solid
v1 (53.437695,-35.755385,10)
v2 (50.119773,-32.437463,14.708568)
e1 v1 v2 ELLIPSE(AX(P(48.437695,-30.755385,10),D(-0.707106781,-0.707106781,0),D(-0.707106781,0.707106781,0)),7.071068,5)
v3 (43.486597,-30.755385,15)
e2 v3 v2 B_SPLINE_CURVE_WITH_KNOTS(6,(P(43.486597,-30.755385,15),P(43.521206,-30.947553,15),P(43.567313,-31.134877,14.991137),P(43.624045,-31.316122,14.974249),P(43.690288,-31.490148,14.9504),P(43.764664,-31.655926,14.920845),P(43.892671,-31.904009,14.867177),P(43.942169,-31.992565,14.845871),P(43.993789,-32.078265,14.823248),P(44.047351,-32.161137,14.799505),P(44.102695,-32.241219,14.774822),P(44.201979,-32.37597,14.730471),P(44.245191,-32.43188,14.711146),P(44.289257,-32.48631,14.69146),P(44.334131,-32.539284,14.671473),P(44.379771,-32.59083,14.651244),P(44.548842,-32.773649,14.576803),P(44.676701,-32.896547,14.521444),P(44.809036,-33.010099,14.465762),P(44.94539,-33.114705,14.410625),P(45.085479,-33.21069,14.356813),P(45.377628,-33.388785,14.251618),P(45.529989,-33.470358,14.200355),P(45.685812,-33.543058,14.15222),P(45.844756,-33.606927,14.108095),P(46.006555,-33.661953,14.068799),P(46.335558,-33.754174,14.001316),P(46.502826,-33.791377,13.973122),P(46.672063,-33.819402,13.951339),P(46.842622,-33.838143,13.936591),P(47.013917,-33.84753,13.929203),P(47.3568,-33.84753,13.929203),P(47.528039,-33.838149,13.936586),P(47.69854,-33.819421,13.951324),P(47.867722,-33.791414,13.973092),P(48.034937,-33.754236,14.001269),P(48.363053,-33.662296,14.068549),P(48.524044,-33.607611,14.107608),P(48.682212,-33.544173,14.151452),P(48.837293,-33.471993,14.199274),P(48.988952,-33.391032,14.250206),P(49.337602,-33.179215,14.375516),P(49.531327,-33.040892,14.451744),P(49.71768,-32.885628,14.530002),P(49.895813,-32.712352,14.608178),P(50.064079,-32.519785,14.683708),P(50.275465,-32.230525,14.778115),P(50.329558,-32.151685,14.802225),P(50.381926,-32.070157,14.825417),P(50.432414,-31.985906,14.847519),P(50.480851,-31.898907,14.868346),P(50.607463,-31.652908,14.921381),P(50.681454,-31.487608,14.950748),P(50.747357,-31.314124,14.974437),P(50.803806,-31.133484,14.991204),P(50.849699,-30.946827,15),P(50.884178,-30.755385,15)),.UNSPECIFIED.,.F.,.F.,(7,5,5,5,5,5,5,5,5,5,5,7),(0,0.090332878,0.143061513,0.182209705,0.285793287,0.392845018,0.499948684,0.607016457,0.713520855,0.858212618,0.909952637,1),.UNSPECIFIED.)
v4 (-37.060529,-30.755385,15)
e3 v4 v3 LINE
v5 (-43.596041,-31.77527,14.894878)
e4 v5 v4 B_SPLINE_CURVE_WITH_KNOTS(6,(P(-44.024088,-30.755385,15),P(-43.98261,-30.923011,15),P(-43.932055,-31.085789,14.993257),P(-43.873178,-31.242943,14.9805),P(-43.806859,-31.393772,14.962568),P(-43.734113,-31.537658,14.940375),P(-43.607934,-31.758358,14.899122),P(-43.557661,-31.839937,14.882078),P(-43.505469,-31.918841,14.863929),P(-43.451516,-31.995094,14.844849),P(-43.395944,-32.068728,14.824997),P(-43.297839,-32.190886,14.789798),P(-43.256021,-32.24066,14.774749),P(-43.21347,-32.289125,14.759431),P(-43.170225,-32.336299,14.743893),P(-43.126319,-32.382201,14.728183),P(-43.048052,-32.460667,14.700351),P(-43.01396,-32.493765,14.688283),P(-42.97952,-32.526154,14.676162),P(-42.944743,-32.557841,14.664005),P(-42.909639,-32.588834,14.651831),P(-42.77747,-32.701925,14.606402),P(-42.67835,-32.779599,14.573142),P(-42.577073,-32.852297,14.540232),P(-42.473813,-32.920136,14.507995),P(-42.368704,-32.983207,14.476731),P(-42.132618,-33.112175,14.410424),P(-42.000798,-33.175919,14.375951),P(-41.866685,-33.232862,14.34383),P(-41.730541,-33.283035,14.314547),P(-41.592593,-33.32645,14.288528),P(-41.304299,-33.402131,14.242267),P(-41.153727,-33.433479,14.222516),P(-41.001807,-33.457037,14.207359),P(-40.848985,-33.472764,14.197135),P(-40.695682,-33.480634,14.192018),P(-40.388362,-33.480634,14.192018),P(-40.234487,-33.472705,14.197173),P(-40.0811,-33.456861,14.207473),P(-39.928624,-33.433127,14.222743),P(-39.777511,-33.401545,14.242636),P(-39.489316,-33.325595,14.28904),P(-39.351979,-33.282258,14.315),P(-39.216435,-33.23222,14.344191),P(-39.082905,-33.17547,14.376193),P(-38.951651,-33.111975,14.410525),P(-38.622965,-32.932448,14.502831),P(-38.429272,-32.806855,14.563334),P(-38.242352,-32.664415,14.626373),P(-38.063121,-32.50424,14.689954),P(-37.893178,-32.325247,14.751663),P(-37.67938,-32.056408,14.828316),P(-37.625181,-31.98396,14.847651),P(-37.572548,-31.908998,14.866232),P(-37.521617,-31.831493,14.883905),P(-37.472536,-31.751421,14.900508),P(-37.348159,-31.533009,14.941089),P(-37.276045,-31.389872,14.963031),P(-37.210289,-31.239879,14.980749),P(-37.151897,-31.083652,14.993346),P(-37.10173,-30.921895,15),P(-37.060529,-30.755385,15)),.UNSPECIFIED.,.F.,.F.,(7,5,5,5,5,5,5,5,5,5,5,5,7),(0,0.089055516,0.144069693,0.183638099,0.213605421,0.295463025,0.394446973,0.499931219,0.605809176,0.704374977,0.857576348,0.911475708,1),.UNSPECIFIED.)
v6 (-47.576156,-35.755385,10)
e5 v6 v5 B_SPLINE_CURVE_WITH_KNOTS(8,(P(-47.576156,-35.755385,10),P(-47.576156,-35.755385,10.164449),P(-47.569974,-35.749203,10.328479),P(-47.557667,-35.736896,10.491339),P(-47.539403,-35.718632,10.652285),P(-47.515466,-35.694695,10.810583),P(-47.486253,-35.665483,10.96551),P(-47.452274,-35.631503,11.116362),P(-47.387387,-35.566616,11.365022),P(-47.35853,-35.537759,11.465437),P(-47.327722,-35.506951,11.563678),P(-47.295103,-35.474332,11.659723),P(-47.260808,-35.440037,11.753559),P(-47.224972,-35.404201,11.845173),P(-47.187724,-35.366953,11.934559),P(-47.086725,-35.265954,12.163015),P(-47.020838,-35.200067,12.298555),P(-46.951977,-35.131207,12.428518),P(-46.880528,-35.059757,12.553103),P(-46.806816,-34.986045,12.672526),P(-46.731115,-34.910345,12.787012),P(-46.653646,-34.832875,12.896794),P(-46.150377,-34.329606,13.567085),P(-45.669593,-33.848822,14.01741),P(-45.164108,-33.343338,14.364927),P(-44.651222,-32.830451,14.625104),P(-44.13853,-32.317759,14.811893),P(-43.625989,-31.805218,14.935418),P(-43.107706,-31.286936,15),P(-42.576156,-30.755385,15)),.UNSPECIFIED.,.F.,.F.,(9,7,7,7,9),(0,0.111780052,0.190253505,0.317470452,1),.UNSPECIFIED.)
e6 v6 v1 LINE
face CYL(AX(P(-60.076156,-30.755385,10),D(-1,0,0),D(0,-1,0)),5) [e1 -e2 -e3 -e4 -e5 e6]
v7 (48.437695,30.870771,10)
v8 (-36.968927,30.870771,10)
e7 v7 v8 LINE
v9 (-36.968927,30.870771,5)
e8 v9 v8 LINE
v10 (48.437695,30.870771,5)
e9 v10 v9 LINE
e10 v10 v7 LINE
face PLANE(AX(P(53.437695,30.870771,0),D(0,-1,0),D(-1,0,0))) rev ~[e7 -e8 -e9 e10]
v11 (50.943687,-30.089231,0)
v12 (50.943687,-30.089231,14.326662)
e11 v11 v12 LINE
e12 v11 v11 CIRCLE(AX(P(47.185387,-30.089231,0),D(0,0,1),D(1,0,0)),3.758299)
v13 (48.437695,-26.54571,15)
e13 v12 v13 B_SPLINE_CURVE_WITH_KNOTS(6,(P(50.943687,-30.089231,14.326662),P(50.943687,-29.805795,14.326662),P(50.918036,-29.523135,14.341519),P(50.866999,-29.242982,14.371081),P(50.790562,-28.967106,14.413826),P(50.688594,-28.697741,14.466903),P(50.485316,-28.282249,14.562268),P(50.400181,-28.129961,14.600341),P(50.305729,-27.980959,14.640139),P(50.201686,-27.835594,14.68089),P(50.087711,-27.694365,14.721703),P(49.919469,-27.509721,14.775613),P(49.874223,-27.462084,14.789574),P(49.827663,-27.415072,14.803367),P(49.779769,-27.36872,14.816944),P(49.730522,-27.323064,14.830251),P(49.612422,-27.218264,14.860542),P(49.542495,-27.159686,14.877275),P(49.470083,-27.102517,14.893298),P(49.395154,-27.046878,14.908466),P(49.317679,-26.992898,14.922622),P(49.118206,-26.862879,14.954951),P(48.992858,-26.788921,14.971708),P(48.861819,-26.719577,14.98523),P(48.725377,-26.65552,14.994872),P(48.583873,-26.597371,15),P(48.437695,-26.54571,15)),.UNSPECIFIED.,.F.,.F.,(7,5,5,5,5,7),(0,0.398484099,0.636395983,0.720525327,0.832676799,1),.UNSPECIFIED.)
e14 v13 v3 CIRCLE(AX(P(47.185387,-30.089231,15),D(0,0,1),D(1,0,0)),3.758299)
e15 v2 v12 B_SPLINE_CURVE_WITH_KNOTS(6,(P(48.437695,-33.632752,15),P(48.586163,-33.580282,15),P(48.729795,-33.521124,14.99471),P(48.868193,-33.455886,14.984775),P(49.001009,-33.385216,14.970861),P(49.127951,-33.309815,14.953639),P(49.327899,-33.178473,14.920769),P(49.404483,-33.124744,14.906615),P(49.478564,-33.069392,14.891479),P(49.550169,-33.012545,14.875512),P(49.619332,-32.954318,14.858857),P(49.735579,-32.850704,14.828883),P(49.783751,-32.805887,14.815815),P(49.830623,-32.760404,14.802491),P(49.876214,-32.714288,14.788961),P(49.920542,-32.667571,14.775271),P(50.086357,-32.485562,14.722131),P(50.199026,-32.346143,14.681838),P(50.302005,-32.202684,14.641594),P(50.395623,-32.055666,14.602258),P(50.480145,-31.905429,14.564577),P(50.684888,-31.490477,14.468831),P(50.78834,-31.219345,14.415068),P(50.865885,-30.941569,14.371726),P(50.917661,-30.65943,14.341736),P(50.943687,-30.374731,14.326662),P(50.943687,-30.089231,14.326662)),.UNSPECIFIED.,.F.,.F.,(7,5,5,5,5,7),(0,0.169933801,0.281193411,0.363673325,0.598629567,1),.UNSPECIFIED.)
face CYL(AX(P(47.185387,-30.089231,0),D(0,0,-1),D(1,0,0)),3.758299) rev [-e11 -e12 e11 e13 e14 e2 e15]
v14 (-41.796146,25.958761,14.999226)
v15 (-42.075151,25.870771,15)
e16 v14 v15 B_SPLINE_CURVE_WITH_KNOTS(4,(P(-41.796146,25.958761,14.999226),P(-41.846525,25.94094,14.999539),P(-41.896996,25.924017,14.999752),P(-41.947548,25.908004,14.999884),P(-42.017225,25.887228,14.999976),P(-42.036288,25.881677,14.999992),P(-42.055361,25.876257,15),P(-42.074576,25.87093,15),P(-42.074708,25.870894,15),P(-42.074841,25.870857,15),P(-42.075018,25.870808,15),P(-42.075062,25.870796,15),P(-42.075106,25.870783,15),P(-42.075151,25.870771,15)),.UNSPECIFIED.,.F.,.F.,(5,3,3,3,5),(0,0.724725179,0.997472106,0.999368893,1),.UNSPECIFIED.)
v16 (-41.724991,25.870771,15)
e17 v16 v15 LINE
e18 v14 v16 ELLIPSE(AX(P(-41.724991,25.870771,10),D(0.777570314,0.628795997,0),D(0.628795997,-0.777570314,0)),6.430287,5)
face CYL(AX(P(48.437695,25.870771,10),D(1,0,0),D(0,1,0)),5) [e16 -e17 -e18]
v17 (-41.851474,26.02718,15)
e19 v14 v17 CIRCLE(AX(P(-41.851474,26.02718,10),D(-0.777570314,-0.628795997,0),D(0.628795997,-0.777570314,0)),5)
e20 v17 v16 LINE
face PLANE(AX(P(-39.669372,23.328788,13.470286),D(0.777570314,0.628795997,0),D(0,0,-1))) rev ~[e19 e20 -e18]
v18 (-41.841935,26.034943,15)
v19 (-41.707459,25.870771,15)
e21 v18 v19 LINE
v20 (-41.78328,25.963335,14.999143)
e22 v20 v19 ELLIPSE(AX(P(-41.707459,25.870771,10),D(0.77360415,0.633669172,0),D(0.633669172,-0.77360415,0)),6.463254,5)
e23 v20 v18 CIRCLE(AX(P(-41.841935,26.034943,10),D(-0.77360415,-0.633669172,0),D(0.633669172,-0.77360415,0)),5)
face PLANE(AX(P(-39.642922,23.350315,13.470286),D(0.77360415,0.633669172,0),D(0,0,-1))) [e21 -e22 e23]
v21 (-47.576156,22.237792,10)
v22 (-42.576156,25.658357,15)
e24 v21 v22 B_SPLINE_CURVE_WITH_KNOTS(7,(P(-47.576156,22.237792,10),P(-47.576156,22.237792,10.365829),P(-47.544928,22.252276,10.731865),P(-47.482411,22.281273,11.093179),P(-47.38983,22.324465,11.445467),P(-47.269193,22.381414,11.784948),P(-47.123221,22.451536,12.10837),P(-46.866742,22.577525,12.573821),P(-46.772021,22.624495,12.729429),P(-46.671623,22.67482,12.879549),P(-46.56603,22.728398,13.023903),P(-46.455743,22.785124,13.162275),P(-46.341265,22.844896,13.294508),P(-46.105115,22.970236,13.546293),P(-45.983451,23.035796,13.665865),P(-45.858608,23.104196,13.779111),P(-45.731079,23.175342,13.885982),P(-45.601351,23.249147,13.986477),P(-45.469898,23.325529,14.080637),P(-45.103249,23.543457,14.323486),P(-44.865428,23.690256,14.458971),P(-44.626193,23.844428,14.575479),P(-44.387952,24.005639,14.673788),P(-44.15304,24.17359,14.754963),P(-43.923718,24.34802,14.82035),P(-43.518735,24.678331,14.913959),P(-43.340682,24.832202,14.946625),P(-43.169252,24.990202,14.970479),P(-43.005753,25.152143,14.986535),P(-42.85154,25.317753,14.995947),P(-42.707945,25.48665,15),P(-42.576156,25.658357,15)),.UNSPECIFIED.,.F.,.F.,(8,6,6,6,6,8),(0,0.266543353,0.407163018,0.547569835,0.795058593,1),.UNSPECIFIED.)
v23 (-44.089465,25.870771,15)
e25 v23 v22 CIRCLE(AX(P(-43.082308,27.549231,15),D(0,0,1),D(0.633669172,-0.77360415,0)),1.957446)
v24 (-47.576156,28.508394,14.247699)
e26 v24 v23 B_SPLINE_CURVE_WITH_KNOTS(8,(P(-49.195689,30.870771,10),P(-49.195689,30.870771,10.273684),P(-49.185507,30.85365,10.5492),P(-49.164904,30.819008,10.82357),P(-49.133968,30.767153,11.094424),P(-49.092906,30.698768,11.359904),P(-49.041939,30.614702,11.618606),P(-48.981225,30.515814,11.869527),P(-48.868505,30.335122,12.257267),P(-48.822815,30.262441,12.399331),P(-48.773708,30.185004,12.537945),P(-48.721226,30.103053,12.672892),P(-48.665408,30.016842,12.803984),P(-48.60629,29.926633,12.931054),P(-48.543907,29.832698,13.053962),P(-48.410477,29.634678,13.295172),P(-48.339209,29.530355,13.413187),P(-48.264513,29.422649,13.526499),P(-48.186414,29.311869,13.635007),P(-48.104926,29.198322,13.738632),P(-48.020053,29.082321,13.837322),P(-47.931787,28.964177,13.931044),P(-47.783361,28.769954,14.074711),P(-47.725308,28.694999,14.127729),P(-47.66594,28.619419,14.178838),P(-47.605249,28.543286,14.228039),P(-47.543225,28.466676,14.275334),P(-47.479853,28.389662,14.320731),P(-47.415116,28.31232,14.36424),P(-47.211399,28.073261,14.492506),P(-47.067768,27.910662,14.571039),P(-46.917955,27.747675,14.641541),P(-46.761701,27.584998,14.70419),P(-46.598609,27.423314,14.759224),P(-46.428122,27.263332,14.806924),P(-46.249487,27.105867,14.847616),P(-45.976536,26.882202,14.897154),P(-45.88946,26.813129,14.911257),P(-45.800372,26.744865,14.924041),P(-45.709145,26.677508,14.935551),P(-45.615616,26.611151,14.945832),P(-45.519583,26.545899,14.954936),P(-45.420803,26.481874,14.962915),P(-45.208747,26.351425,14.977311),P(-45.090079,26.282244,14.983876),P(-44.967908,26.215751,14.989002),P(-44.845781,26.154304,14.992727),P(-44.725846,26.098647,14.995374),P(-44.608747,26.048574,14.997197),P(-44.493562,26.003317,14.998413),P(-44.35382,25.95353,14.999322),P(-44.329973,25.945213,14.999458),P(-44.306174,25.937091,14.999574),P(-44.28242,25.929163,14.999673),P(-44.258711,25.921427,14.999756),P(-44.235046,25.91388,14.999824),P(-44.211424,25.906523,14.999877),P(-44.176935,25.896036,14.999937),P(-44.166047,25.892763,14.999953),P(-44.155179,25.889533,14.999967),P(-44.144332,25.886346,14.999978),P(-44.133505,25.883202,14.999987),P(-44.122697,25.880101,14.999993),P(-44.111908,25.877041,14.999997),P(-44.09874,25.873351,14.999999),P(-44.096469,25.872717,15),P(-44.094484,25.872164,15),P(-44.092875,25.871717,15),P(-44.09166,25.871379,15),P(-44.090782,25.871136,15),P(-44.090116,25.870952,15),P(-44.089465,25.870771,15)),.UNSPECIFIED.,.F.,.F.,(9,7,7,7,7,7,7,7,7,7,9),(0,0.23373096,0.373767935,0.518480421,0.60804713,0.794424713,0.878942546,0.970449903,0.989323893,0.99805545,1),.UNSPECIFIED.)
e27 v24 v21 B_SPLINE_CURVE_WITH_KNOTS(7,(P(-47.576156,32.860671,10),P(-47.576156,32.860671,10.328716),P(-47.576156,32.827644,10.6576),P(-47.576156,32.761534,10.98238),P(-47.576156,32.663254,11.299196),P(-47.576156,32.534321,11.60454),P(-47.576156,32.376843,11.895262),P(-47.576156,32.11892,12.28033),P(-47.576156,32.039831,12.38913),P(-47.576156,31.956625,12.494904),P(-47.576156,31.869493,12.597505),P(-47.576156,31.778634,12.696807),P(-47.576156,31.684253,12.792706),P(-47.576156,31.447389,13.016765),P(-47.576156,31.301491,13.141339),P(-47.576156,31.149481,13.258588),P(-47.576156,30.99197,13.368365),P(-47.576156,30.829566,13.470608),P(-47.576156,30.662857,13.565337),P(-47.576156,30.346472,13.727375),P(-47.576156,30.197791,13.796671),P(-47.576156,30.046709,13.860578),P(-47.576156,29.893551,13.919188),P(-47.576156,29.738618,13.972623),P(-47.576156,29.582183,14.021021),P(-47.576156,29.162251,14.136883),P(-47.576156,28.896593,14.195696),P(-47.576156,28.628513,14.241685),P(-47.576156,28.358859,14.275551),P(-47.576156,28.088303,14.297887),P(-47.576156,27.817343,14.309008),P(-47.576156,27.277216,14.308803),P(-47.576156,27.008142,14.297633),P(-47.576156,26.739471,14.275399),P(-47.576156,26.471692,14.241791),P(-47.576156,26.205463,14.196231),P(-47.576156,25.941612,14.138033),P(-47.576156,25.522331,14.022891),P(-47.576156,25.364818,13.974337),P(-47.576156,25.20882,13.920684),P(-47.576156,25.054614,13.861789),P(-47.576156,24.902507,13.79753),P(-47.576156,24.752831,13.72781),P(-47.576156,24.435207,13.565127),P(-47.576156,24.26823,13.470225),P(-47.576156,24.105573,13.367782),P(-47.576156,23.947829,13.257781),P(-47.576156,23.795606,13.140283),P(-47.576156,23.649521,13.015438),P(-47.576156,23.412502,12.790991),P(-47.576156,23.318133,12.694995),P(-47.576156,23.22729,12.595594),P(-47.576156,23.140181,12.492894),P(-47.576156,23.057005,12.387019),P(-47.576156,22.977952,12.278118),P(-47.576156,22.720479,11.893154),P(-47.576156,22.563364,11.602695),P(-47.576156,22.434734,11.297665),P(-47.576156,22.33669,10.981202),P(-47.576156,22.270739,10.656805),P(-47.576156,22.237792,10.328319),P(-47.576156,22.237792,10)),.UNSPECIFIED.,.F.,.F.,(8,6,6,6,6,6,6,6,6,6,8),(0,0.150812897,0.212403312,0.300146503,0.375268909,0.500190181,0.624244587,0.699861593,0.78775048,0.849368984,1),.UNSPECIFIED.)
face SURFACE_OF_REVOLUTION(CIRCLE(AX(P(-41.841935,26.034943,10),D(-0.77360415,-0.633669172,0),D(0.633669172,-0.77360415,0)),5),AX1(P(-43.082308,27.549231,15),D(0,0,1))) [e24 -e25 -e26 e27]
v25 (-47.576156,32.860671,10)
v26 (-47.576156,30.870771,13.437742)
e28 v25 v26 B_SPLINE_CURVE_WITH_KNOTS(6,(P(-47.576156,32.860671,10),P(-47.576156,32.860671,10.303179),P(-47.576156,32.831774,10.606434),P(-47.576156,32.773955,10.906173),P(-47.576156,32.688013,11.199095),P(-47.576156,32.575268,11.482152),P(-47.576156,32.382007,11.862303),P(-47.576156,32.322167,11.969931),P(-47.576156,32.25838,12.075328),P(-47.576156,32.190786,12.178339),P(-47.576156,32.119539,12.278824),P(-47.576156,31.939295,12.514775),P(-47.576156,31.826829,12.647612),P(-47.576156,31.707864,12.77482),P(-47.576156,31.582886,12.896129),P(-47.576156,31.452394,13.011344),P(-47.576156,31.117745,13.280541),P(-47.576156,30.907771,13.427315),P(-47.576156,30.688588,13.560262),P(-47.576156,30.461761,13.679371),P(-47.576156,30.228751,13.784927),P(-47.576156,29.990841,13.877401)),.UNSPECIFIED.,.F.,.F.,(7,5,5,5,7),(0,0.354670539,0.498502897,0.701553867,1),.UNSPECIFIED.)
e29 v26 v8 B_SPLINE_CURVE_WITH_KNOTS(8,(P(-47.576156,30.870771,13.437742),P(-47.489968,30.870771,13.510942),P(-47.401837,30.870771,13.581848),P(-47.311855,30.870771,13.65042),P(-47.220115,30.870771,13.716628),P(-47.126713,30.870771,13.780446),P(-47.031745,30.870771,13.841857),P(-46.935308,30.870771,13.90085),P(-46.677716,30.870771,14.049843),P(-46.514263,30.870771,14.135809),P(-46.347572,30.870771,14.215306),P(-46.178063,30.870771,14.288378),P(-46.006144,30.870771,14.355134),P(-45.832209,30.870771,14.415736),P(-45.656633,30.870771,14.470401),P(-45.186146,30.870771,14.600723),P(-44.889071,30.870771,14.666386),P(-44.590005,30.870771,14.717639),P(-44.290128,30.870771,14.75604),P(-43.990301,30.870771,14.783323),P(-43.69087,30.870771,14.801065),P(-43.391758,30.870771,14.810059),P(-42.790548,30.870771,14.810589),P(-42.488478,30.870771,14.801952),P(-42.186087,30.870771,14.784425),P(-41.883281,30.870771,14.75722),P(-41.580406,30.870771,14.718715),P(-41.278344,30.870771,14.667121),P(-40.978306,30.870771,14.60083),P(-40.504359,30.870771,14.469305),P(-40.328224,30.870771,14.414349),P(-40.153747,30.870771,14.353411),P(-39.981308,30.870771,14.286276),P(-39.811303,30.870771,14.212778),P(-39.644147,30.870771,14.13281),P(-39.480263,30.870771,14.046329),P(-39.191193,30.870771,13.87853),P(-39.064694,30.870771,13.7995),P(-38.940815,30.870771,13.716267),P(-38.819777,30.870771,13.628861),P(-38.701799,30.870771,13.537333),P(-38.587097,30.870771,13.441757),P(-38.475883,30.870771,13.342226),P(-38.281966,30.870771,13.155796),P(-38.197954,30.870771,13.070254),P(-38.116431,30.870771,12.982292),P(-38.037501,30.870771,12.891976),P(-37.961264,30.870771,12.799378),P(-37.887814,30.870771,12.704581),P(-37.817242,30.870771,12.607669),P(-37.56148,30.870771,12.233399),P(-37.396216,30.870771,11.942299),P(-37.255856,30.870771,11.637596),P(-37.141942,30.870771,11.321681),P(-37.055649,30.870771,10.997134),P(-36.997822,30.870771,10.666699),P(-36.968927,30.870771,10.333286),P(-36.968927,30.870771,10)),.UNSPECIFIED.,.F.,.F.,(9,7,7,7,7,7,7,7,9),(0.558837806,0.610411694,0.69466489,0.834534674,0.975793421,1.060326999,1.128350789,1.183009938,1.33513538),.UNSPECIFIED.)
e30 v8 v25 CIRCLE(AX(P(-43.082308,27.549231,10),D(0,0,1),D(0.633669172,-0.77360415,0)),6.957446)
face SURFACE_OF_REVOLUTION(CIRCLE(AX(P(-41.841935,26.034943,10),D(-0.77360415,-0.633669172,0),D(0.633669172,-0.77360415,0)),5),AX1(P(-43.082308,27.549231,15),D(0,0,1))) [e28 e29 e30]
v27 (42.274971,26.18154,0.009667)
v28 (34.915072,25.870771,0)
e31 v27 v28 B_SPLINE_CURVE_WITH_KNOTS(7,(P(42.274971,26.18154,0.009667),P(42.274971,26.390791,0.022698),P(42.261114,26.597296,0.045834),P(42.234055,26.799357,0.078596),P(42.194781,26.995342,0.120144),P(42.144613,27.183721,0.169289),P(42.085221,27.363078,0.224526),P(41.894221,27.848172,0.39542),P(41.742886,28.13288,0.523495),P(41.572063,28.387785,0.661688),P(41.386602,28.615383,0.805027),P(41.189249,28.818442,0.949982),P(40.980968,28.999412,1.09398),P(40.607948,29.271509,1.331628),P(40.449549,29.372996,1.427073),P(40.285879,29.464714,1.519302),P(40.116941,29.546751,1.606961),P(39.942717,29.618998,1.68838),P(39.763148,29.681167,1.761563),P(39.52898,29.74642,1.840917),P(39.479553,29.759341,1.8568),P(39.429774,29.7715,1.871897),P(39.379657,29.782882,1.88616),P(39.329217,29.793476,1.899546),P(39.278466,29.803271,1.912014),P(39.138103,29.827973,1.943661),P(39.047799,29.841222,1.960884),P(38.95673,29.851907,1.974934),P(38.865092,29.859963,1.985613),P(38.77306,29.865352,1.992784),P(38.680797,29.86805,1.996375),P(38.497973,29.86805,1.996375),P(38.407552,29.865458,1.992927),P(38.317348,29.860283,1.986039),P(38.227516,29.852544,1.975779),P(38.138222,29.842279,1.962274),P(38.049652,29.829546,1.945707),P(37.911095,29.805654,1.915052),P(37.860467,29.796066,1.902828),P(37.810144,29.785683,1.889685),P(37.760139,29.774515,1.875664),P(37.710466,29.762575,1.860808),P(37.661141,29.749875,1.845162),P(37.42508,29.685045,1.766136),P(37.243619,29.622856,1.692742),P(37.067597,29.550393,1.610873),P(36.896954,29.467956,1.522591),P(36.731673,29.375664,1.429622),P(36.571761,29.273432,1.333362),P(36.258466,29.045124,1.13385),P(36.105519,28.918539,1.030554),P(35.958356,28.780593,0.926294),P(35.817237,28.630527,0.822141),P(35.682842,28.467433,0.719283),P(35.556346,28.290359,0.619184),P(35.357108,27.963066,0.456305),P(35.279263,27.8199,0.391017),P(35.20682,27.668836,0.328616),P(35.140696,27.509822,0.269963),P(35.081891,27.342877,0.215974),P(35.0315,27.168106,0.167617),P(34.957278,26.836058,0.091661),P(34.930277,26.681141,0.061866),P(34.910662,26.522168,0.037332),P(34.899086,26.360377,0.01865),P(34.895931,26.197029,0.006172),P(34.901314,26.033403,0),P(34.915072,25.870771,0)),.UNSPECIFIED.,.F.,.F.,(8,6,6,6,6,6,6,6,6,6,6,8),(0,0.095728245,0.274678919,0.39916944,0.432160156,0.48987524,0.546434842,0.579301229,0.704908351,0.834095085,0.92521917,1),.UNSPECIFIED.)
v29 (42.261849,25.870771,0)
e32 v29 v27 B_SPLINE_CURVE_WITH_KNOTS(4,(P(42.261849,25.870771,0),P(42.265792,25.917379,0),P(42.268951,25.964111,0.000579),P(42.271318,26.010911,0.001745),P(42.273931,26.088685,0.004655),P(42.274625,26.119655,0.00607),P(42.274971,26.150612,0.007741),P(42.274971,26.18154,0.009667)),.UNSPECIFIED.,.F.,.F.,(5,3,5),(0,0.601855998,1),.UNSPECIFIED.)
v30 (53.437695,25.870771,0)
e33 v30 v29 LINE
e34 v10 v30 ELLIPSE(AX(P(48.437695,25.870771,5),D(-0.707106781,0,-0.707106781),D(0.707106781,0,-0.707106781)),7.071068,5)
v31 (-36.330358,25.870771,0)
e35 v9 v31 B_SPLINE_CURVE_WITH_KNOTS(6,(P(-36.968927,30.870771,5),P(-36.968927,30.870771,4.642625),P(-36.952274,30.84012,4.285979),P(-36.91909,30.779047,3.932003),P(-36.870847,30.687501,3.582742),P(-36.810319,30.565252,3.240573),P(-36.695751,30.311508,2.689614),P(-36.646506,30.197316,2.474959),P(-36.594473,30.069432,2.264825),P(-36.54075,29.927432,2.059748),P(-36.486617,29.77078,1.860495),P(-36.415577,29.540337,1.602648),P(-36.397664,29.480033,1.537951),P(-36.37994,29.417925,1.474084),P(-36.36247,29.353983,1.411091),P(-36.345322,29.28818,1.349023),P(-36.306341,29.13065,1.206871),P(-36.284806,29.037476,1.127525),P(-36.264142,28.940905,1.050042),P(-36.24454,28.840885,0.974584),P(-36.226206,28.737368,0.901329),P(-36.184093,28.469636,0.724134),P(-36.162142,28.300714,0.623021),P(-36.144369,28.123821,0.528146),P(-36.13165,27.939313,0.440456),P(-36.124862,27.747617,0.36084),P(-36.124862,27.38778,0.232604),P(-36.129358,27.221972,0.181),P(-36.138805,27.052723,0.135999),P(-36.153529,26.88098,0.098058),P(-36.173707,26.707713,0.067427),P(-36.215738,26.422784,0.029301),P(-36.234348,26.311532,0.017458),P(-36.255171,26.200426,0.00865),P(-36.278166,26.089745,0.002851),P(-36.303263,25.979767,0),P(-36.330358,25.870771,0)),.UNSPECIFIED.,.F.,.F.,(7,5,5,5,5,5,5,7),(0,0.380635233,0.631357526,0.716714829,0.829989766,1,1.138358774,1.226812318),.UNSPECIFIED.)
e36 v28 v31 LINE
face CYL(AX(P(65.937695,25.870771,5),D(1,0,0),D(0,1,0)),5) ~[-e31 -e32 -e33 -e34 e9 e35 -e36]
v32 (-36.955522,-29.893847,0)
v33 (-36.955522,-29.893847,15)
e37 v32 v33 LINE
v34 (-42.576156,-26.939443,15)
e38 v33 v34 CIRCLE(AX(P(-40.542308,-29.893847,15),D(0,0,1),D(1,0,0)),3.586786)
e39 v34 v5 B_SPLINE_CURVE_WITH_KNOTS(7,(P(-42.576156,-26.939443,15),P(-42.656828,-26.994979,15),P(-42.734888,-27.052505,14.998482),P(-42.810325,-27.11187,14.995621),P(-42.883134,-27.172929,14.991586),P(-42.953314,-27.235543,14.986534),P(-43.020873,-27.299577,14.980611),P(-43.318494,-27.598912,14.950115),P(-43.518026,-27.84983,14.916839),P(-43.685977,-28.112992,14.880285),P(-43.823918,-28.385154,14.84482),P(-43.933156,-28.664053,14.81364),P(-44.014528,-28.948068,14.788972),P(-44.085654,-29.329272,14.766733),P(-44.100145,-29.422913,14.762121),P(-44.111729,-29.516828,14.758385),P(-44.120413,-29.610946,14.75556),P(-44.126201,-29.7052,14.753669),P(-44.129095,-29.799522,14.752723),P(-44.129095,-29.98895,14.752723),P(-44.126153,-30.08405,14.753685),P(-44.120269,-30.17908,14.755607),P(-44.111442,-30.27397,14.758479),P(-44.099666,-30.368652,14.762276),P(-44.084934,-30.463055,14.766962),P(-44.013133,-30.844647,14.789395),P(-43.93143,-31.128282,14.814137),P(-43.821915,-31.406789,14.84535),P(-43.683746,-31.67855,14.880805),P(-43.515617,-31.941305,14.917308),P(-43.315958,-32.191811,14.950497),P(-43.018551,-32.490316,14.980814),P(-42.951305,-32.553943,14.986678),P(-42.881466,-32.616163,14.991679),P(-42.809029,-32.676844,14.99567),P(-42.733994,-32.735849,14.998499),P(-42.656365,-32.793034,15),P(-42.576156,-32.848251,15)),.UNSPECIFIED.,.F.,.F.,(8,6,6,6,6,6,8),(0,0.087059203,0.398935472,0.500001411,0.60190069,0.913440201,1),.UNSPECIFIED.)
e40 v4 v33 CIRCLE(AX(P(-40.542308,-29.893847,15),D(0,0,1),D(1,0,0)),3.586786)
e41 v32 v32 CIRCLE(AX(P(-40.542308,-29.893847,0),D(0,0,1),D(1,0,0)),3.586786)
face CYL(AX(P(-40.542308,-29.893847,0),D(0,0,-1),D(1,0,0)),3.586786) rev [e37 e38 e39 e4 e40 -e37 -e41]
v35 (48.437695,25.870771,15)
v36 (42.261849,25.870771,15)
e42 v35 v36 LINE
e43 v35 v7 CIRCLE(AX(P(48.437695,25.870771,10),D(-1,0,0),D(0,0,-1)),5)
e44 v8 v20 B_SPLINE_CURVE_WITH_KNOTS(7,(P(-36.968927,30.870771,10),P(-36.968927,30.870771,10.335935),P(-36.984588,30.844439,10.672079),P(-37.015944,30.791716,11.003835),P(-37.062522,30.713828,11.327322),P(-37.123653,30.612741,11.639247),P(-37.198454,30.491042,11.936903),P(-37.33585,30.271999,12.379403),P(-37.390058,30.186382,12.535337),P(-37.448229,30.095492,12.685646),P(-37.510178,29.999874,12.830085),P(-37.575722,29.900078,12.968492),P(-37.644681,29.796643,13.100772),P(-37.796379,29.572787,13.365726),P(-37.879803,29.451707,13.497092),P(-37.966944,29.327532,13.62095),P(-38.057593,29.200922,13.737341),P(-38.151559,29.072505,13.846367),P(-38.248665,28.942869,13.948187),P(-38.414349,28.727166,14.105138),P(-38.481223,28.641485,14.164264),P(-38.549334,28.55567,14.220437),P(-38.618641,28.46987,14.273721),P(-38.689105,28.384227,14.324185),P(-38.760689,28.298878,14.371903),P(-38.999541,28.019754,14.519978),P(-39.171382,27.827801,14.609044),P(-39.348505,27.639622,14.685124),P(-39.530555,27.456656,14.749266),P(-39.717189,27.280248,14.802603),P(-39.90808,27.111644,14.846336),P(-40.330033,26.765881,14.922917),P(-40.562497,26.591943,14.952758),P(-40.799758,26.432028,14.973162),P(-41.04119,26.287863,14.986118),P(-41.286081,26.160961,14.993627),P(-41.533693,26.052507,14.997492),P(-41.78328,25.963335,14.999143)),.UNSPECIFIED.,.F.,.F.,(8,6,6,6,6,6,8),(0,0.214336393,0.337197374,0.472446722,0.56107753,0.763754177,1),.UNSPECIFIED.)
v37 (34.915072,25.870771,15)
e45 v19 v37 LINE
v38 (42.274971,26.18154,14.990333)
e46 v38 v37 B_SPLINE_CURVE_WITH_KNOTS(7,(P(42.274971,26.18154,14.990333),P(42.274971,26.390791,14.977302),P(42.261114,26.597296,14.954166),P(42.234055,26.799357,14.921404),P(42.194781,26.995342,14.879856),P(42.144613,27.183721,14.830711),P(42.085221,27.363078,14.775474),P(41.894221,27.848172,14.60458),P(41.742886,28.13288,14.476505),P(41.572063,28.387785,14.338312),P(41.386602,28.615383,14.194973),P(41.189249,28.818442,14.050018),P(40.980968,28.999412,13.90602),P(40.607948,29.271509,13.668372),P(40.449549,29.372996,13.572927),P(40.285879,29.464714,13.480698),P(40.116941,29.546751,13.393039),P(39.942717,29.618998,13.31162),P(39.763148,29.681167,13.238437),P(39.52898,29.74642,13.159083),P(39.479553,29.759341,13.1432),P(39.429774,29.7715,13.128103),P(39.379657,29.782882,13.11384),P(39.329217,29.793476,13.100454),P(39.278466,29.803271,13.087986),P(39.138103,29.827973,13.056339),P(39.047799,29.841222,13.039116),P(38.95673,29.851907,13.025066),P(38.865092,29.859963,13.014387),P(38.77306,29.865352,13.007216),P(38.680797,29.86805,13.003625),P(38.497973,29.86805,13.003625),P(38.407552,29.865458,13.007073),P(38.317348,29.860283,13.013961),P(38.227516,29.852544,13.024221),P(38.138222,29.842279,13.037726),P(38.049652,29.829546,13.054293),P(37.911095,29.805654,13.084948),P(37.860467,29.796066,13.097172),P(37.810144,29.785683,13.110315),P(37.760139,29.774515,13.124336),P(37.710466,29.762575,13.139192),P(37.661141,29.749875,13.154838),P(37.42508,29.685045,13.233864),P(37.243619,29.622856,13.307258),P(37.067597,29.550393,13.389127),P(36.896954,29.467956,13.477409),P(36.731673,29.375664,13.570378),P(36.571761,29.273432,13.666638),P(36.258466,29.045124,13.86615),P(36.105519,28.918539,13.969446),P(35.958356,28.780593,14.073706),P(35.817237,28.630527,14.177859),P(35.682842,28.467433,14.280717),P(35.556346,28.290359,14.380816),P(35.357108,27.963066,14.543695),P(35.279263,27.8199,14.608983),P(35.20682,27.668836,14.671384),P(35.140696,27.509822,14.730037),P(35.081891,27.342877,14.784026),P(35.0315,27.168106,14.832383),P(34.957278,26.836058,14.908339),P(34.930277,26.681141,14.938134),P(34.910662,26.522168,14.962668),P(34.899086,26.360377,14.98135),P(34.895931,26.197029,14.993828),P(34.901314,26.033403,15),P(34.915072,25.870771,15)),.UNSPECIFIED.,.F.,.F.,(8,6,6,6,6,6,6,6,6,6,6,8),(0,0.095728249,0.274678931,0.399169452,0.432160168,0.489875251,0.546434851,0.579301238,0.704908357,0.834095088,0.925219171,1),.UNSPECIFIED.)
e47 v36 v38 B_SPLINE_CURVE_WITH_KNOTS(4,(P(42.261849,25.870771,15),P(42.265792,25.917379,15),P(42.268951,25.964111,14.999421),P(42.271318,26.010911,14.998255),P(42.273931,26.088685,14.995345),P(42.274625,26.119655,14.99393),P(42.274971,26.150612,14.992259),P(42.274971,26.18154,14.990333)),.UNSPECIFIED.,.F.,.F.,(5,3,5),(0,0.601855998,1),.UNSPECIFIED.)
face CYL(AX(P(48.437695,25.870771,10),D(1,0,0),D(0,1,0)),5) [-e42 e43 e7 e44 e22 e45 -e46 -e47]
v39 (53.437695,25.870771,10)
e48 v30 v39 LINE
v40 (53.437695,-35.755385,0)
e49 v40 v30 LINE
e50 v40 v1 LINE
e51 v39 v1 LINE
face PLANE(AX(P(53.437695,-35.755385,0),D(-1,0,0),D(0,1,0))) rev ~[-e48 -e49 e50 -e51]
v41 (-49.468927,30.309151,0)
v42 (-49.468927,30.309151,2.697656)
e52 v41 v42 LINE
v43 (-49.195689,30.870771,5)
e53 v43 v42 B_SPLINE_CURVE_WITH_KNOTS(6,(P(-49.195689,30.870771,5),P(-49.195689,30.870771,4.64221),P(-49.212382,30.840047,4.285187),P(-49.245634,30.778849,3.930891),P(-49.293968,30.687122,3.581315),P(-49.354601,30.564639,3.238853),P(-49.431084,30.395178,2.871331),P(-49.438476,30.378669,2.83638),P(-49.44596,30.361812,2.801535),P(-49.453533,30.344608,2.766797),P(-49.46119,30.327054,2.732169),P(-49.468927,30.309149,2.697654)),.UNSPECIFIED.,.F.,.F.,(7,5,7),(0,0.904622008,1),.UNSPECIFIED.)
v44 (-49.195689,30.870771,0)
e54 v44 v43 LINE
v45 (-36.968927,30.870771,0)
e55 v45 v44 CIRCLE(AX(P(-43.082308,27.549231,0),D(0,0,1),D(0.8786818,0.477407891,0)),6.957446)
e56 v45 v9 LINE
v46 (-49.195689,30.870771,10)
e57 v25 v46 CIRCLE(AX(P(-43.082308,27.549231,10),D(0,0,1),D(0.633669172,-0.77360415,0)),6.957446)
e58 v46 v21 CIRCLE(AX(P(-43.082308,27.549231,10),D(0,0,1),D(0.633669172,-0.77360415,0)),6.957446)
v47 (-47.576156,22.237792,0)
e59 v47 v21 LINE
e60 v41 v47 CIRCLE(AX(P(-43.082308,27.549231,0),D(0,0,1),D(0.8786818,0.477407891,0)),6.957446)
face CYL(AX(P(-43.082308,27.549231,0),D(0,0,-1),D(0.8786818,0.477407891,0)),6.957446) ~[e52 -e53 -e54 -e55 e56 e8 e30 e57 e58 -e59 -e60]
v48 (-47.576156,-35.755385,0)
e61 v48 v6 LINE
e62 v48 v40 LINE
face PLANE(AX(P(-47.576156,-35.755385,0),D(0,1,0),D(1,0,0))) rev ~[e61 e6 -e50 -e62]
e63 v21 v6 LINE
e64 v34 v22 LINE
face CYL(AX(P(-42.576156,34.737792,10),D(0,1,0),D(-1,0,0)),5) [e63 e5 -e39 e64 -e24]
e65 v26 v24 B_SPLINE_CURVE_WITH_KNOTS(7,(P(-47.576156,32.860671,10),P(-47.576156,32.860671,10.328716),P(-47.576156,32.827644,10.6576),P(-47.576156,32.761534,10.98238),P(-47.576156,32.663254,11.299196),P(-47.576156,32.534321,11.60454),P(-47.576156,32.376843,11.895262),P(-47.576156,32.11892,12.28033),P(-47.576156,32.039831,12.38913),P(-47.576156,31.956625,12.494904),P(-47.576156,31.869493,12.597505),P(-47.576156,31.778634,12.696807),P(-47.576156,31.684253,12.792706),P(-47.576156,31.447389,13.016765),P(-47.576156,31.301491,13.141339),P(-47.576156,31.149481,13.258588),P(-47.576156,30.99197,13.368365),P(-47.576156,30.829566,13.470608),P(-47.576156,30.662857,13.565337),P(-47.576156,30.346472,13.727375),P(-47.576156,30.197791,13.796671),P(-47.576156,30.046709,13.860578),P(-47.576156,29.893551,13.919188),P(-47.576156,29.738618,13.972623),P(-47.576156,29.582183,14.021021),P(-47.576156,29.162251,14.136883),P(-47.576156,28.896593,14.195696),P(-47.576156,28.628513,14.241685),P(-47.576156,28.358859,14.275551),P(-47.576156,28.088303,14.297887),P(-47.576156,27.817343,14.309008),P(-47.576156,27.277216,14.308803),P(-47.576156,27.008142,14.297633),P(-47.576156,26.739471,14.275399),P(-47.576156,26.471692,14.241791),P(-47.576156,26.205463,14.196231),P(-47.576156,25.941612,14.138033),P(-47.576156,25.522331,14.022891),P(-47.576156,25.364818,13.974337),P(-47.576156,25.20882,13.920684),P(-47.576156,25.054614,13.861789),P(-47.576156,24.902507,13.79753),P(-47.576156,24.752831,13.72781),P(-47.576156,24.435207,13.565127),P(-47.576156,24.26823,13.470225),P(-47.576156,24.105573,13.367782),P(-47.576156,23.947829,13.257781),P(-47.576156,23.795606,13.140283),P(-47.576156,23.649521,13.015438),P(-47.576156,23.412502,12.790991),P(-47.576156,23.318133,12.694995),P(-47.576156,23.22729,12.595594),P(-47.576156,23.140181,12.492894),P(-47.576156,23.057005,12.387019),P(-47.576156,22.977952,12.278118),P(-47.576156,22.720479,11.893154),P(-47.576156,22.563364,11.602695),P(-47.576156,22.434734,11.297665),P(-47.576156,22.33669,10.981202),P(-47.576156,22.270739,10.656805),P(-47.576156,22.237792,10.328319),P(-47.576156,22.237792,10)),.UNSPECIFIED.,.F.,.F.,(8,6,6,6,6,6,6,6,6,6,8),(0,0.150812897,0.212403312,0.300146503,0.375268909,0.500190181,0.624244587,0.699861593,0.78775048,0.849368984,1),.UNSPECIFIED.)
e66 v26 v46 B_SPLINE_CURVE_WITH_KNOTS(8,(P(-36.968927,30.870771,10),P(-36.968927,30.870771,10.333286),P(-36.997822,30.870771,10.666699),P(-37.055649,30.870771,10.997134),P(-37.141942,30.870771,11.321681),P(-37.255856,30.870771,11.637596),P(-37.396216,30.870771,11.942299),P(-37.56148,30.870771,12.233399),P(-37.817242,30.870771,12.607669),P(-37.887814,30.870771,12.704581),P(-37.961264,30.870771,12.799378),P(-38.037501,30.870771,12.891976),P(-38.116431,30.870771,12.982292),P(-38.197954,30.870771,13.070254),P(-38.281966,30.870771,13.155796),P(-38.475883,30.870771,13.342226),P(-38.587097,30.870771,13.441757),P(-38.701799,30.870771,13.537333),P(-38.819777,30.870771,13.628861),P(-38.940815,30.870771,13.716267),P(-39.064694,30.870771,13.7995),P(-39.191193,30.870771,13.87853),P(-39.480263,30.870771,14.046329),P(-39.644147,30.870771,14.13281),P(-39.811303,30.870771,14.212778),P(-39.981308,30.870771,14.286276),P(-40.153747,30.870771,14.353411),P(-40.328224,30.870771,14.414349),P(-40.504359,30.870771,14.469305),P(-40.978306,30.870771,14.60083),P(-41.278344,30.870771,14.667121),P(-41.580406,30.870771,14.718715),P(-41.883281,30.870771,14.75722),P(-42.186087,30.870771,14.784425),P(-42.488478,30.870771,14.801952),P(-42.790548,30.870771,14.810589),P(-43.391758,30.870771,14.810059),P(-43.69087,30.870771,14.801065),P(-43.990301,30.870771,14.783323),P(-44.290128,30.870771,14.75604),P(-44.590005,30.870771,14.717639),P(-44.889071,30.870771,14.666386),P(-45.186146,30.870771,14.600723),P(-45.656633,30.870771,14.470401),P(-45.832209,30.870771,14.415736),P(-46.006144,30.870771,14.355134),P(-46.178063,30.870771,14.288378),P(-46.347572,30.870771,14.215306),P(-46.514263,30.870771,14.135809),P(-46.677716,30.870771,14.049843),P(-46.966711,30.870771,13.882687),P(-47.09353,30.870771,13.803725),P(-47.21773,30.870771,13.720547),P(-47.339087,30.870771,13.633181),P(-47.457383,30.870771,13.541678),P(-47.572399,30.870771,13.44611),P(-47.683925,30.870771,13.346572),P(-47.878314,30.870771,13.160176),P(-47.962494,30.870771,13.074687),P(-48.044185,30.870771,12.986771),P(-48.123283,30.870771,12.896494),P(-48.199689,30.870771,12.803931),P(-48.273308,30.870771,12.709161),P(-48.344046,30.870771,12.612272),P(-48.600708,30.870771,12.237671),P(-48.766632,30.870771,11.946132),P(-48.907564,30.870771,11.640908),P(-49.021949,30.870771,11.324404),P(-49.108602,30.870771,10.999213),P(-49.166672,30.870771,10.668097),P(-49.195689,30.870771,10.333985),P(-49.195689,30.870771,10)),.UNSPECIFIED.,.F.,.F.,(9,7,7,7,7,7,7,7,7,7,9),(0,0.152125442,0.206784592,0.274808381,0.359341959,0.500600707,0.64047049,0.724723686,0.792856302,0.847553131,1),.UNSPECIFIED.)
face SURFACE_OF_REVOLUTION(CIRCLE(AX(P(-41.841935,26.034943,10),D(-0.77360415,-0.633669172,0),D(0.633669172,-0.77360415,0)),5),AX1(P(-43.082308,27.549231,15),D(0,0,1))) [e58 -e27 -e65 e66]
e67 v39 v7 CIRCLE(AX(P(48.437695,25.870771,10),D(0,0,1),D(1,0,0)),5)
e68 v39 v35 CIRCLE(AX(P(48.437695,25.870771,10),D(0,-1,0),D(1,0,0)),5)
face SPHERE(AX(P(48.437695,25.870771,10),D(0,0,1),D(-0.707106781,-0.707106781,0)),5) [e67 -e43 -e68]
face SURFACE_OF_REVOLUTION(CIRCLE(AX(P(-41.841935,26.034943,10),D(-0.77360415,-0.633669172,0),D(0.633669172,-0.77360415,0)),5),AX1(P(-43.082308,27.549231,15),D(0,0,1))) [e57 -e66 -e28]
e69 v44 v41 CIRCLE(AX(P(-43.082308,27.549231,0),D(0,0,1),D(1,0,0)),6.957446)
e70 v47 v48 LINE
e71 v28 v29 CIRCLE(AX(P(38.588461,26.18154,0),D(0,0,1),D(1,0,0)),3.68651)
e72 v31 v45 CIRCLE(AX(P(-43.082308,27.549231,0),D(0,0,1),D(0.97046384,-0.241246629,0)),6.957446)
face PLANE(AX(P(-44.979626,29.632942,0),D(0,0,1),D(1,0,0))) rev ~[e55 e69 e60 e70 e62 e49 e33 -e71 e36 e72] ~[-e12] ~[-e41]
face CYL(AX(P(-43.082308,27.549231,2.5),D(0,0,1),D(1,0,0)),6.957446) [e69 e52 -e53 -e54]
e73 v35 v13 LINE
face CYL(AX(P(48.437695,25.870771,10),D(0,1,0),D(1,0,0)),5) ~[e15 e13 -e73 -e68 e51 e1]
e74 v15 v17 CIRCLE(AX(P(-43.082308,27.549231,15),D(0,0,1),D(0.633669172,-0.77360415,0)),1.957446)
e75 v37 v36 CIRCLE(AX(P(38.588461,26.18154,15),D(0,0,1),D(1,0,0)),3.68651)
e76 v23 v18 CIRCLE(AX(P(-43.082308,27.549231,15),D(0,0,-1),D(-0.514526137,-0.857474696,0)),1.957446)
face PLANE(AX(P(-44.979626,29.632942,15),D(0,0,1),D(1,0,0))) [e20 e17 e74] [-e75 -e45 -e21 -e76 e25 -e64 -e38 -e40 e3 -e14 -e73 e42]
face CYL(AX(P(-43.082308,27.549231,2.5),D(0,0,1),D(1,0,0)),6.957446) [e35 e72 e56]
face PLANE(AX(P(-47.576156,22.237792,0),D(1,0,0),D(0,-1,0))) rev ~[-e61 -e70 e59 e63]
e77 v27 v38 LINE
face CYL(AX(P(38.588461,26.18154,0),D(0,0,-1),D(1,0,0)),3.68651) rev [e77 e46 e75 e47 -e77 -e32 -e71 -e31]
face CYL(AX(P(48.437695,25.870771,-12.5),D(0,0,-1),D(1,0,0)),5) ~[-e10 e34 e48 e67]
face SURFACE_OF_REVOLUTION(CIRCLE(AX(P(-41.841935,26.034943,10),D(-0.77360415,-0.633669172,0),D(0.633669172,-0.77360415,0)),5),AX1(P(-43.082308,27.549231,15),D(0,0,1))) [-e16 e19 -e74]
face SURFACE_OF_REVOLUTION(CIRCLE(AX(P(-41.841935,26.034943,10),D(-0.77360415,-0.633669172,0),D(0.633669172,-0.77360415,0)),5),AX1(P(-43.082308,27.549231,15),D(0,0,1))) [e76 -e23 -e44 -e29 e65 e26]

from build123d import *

# Parameters (mm, degrees)
F0_R         = 3.586786404
F0_R_2       = 3.7582992631
F0_R_3       = 3.6865102679
F1_DEPTH     = 15
F2_T1_DEPTH  = 126.0138504207
F2_T3_DEPTH  = 22.5
F2_T5_DEPTH  = 74.126155749
F2_S9_W      = 5
F2_S9_H      = 5
F2_T10_DEPTH = 5
F2_T16_DEPTH = 97.9066217834
F2_S17_R     = 6.9574459714
F2_T18_DEPTH = 51
F2_T22_DEPTH = 82.9931766736
F2_S23_R     = 6.9574459714
F2_T24_DEPTH = 43
F2_T28_ANGLE = 359.64
F2_T34_ANGLE = 359.64
F2_T40_ANGLE = 359.64
F2_T46_DEPTH = 115.4066217834
F2_S47_R     = 6.9574459714
F2_T48_DEPTH = 59
F2_T53_ANGLE = 359.64
F2_T58_DEPTH = 97.9066217834
F2_S59_R     = 6.9574459714
F2_T60_DEPTH = 51
F2_T66_ANGLE = 359.64
F2_T71_DEPTH = 82.9931766736
F2_S72_R     = 6.9574459714
F2_T73_DEPTH = 43


# Not quite as in the source:
# - a fillet or chamfer that OpenCascade refuses, or shapes differently, is made with other operations: its cross-section is extruded or revolved along the edge and cut away or added


with BuildPart() as f1:
    # F0 (on Top) → F1 (new body)
    with BuildSketch(Plane.XY):
        with BuildLine():
            Line((-47.5761555135, 22.2377919602), (-47.5761555135, 30.8707710356))
            Line((-47.5761555135, 30.8707710356), (-36.9689268762, 30.8707710356))
            ThreePointArc((-36.9689268762, 30.8707710356), (-47.4740962985, 32.9453643179), (-47.5761555135, 22.2377919602))
        make_face()
        with BuildLine():
            Line((-36.9689268762, 30.8707710356), (-47.5761555135, 30.8707710356))
            Line((-47.5761555135, 30.8707710356), (-47.5761555135, 22.2377919602))
            ThreePointArc((-47.5761555135, 22.2377919602), (-40.1548216165, 21.2376644422), (-36.1248620528, 27.5492314249))
            ThreePointArc((-36.1248620528, 27.5492314249), (-36.3391791701, 29.2627855393), (-36.9689268762, 30.8707710356))
        make_face()
        with BuildLine():
            Line((53.4376949072, 30.8707710356), (-36.9689268762, 30.8707710356))
            ThreePointArc((-36.9689268762, 30.8707710356), (-36.3391791701, 29.2627855393), (-36.1248620528, 27.5492314249))
            ThreePointArc((-36.1248620528, 27.5492314249), (-40.1548216165, 21.2376644422), (-47.5761555135, 22.2377919602))
            Line((-47.5761555135, 22.2377919602), (-47.5761555135, -35.7553847134))
            Line((-47.5761555135, -35.7553847134), (53.4376949072, -35.7553847134))
            Line((53.4376949072, -35.7553847134), (53.4376949072, 30.8707710356))
        make_face()
        with Locations((-40.5423082411, -29.8938471824)):
            Circle(F0_R, mode=Mode.SUBTRACT)
        with Locations((47.1853874624, -30.089231208)):
            Circle(F0_R_2, mode=Mode.SUBTRACT)
        with Locations((38.5884605348, 26.1815395206)):
            Circle(F0_R_3, mode=Mode.SUBTRACT)
    extrude(amount=F1_DEPTH)

    # F2: fillet of radius 5 on 7 edges, made by hand

    # F2_s2 → F2_t1 (cut)
    with BuildSketch(Plane.YZ.offset(-60.0761555135)):
        with BuildLine():
            ThreePointArc((-35.7553847134, 10), (-34.2909186193, 13.5355339059), (-30.7553847134, 15))
            Line((-30.7553847134, 15), (-35.7553847134, 15))
            Line((-35.7553847134, 15), (-35.7553847134, 10))
        make_face()
    extrude(amount=F2_T1_DEPTH, mode=Mode.SUBTRACT)

    # F2_s4 → F2_t3 (cut)
    with BuildSketch(Plane.XY.offset(-12.5)):
        with BuildLine():
            ThreePointArc((53.4376949072, 25.8707710356), (51.9732288131, 29.4063049415), (48.4376949072, 30.8707710356))
            Line((48.4376949072, 30.8707710356), (53.4376949072, 30.8707710356))
            Line((53.4376949072, 30.8707710356), (53.4376949072, 25.8707710356))
        make_face()
    extrude(amount=F2_T3_DEPTH, mode=Mode.SUBTRACT)

    # F2_s6 → F2_t5 (cut)
    with BuildSketch(Plane.XZ.offset(-25.8707710356)):
        with BuildLine():
            ThreePointArc((53.4376949072, 10), (51.9732288131, 13.5355339059), (48.4376949072, 15))
            Line((48.4376949072, 15), (53.4376949072, 15))
            Line((53.4376949072, 15), (53.4376949072, 10))
        make_face()
    extrude(amount=F2_T5_DEPTH, mode=Mode.SUBTRACT)


with BuildPart() as f2_tool8:
    # F2_s9 → F2_t10 (new body)
    with BuildSketch(Plane.XY.offset(10)):
        with Locations((50.9376949072, 28.3707710356)):
            Rectangle(F2_S9_W, F2_S9_H)
    extrude(amount=F2_T10_DEPTH)

    # F2_s11 → F2_t12 (revolve, cut)
    with BuildSketch(Plane(origin=(48.4376949072, 25.8707710356, 10), x_dir=(-0.7071067812, -0.7071067812, 0), z_dir=(-0.7071067812, 0.7071067812, 0))):
        with BuildLine():
            ThreePointArc((0, -5), (5, 0), (0, 5))
            Line((0, 5), (0, -5))
        make_face()
    revolve(axis=Axis((48.4376949072, 25.8707710356, 10), (0, 0, 1)), mode=Mode.SUBTRACT)


with BuildPart() as f1_1:
    add(f1.part)

    # F2_t7: cut F2_tool8
    add(f2_tool8.part, mode=Mode.SUBTRACT)


with BuildPart() as f2_tool14:
    # F2_s15 → F2_t16 (new body)
    with BuildSketch(Plane.YZ.offset(48.4376949072)):
        with BuildLine():
            ThreePointArc((30.8707710356, 10), (29.4063049415, 13.5355339059), (25.8707710356, 15))
            Line((25.8707710356, 15), (30.8707710356, 15))
            Line((30.8707710356, 15), (30.8707710356, 10))
        make_face()
    extrude(amount=-F2_T16_DEPTH)

    # F2_s17 → F2_t18 (cut, symmetric)
    with BuildSketch(Plane.XY.offset(12.5)):
        with Locations((-43.0823080242, 27.5492314249)):
            Circle(F2_S17_R)
    extrude(amount=F2_T18_DEPTH, both=True, mode=Mode.SUBTRACT)


with BuildPart() as f1_2:
    add(f1_1.part)

    # F2_t13: cut F2_tool14
    add(f2_tool14.part, mode=Mode.SUBTRACT)


with BuildPart() as f2_tool20:
    # F2_s21 → F2_t22 (new body)
    with BuildSketch(Plane.XZ.offset(-34.7377919602)):
        with BuildLine():
            ThreePointArc((-47.5761555135, 10), (-46.1116894195, 13.5355339059), (-42.5761555135, 15))
            Line((-42.5761555135, 15), (-47.5761555135, 15))
            Line((-47.5761555135, 15), (-47.5761555135, 10))
        make_face()
    extrude(amount=F2_T22_DEPTH)

    # F2_s23 → F2_t24 (cut, symmetric)
    with BuildSketch(Plane.XY.offset(12.5)):
        with Locations((-43.0823080242, 27.5492314249)):
            Circle(F2_S23_R)
    extrude(amount=F2_T24_DEPTH, both=True, mode=Mode.SUBTRACT)


with BuildPart() as f1_3:
    add(f1_2.part)

    # F2_t19: cut F2_tool20
    add(f2_tool20.part, mode=Mode.SUBTRACT)


with BuildPart() as f2_tool26:
    # F2_s27 → F2_t28 (revolve)
    with BuildSketch(Plane(origin=(-12.2782997509, -10.0573142374, 0), x_dir=(0, 0, 1), z_dir=(-0.77360415, -0.6336691716, 0))):
        with BuildLine():
            ThreePointArc((10, 41.6546842262), (13.5355339059, 43.1191503203), (15, 46.6546842262))
            Line((15, 46.6546842262), (15, 41.6546842262))
            Line((15, 41.6546842262), (10, 41.6546842262))
        make_face()
    revolve(axis=Axis((-43.0823080242, 27.5492314249, 15), (0, 0, 1)), revolution_arc=F2_T28_ANGLE)

    split(bisect_by=Plane.XZ.offset(-30.8707710356), keep=Keep.TOP)

    split(bisect_by=Plane.YZ.offset(-47.5761555135), keep=Keep.BOTTOM)


with BuildPart() as f1_4:
    add(f1_3.part)

    # F2_t25: cut F2_tool26
    add(f2_tool26.part, mode=Mode.SUBTRACT)


with BuildPart() as f2_tool32:
    # F2_s33 → F2_t34 (revolve)
    with BuildSketch(Plane(origin=(-12.2782997509, -10.0573142374, 0), x_dir=(0, 0, 1), z_dir=(-0.77360415, -0.6336691716, 0))):
        with BuildLine():
            ThreePointArc((10, 41.6546842262), (13.5355339059, 43.1191503203), (15, 46.6546842262))
            Line((15, 46.6546842262), (15, 41.6546842262))
            Line((15, 41.6546842262), (10, 41.6546842262))
        make_face()
    revolve(axis=Axis((-43.0823080242, 27.5492314249, 15), (0, 0, 1)), revolution_arc=F2_T34_ANGLE)

    split(bisect_by=Plane.XZ.offset(-30.8707710356), keep=Keep.BOTTOM)

    split(bisect_by=Plane.YZ.offset(-47.5761555135), keep=Keep.TOP)


with BuildPart() as f1_5:
    add(f1_4.part)

    # F2_t31: cut F2_tool32
    add(f2_tool32.part, mode=Mode.SUBTRACT)


with BuildPart() as f2_tool38:
    # F2_s39 → F2_t40 (revolve)
    with BuildSketch(Plane(origin=(-12.2782997509, -10.0573142374, 0), x_dir=(0, 0, 1), z_dir=(-0.77360415, -0.6336691716, 0))):
        with BuildLine():
            ThreePointArc((10, 41.6546842262), (13.5355339059, 43.1191503203), (15, 46.6546842262))
            Line((15, 46.6546842262), (15, 41.6546842262))
            Line((15, 41.6546842262), (10, 41.6546842262))
        make_face()
    revolve(axis=Axis((-43.0823080242, 27.5492314249, 15), (0, 0, 1)), revolution_arc=F2_T40_ANGLE)

    split(bisect_by=Plane.XZ.offset(-30.8707710356), keep=Keep.BOTTOM)

    split(bisect_by=Plane.YZ.offset(-47.5761555135), keep=Keep.BOTTOM)


with BuildPart() as f1_6:
    add(f1_5.part)

    # F2_t37: cut F2_tool38
    add(f2_tool38.part, mode=Mode.SUBTRACT)


with BuildPart() as f2_tool44:
    # F2_s45 → F2_t46 (new body)
    with BuildSketch(Plane.YZ.offset(65.9376949072)):
        with BuildLine():
            ThreePointArc((30.8707710356, 5), (29.4063049415, 1.4644660941), (25.8707710356, 0))
            Line((25.8707710356, 0), (30.8707710356, 0))
            Line((30.8707710356, 0), (30.8707710356, 5))
        make_face()
    extrude(amount=-F2_T46_DEPTH)

    # F2_s47 → F2_t48 (cut, symmetric)
    with BuildSketch(Plane.XY.offset(2.5)):
        with Locations((-43.0823080242, 27.5492314249)):
            Circle(F2_S47_R)
    extrude(amount=F2_T48_DEPTH, both=True, mode=Mode.SUBTRACT)


with BuildPart() as f1_7:
    add(f1_6.part)

    # F2_t43: cut F2_tool44
    add(f2_tool44.part, mode=Mode.SUBTRACT)


with BuildPart() as f2_tool51:
    # F2_s52 → F2_t53 (revolve)
    with BuildSketch(Plane(origin=(-12.2782997509, -10.0573142374, 0), x_dir=(0, 0, 1), z_dir=(-0.77360415, -0.6336691716, 0))):
        with BuildLine():
            ThreePointArc((10, 41.6546842262), (13.5355339059, 43.1191503203), (15, 46.6546842262))
            Line((15, 46.6546842262), (15, 41.6546842262))
            Line((15, 41.6546842262), (10, 41.6546842262))
        make_face()
    revolve(axis=Axis((-43.0823080242, 27.5492314249, 15), (0, 0, 1)), revolution_arc=F2_T53_ANGLE)

    split(bisect_by=Plane.XZ.offset(-30.8707710356), keep=Keep.TOP)

    split(bisect_by=Plane.YZ.offset(-47.5761555135), keep=Keep.TOP)


with BuildPart() as f2_tool56:
    # F2_s57 → F2_t58 (new body)
    with BuildSketch(Plane.YZ.offset(48.4376949072)):
        with BuildLine():
            ThreePointArc((30.8707710356, 10), (29.4063049415, 13.5355339059), (25.8707710356, 15))
            Line((25.8707710356, 15), (30.8707710356, 15))
            Line((30.8707710356, 15), (30.8707710356, 10))
        make_face()
    extrude(amount=-F2_T58_DEPTH)

    # F2_s59 → F2_t60 (intersect, symmetric)
    with BuildSketch(Plane.XY.offset(12.5)):
        with Locations((-43.0823080242, 27.5492314249)):
            Circle(F2_S59_R)
    extrude(amount=F2_T60_DEPTH, both=True, mode=Mode.INTERSECT)


with BuildPart() as f2_tool51_1:
    add(f2_tool51.part)

    # F2_t61: intersect F2_tool56
    add(f2_tool56.part, mode=Mode.INTERSECT)


with BuildPart() as f1_8:
    add(f1_7.part)

    # F2_t49: cut F2_tool51
    add(f2_tool51_1.part, mode=Mode.SUBTRACT)


with BuildPart() as f2_tool64:
    # F2_s65 → F2_t66 (revolve)
    with BuildSketch(Plane(origin=(-12.2782997509, -10.0573142374, 0), x_dir=(0, 0, 1), z_dir=(-0.77360415, -0.6336691716, 0))):
        with BuildLine():
            ThreePointArc((10, 41.6546842262), (13.5355339059, 43.1191503203), (15, 46.6546842262))
            Line((15, 46.6546842262), (15, 41.6546842262))
            Line((15, 41.6546842262), (10, 41.6546842262))
        make_face()
    revolve(axis=Axis((-43.0823080242, 27.5492314249, 15), (0, 0, 1)), revolution_arc=F2_T66_ANGLE)

    split(bisect_by=Plane.XZ.offset(-30.8707710356), keep=Keep.TOP)

    split(bisect_by=Plane.YZ.offset(-47.5761555135), keep=Keep.TOP)


with BuildPart() as f2_tool69:
    # F2_s70 → F2_t71 (new body)
    with BuildSketch(Plane.XZ.offset(-34.7377919602)):
        with BuildLine():
            ThreePointArc((-47.5761555135, 10), (-46.1116894195, 13.5355339059), (-42.5761555135, 15))
            Line((-42.5761555135, 15), (-47.5761555135, 15))
            Line((-47.5761555135, 15), (-47.5761555135, 10))
        make_face()
    extrude(amount=F2_T71_DEPTH)

    # F2_s72 → F2_t73 (intersect, symmetric)
    with BuildSketch(Plane.XY.offset(12.5)):
        with Locations((-43.0823080242, 27.5492314249)):
            Circle(F2_S72_R)
    extrude(amount=F2_T73_DEPTH, both=True, mode=Mode.INTERSECT)


with BuildPart() as f2_tool64_1:
    add(f2_tool64.part)

    # F2_t74: intersect F2_tool69
    add(f2_tool69.part, mode=Mode.INTERSECT)


with BuildPart() as f1_9:
    add(f1_8.part)

    # F2_t62: cut F2_tool64
    add(f2_tool64_1.part, mode=Mode.SUBTRACT)


solid = f1_9.part
